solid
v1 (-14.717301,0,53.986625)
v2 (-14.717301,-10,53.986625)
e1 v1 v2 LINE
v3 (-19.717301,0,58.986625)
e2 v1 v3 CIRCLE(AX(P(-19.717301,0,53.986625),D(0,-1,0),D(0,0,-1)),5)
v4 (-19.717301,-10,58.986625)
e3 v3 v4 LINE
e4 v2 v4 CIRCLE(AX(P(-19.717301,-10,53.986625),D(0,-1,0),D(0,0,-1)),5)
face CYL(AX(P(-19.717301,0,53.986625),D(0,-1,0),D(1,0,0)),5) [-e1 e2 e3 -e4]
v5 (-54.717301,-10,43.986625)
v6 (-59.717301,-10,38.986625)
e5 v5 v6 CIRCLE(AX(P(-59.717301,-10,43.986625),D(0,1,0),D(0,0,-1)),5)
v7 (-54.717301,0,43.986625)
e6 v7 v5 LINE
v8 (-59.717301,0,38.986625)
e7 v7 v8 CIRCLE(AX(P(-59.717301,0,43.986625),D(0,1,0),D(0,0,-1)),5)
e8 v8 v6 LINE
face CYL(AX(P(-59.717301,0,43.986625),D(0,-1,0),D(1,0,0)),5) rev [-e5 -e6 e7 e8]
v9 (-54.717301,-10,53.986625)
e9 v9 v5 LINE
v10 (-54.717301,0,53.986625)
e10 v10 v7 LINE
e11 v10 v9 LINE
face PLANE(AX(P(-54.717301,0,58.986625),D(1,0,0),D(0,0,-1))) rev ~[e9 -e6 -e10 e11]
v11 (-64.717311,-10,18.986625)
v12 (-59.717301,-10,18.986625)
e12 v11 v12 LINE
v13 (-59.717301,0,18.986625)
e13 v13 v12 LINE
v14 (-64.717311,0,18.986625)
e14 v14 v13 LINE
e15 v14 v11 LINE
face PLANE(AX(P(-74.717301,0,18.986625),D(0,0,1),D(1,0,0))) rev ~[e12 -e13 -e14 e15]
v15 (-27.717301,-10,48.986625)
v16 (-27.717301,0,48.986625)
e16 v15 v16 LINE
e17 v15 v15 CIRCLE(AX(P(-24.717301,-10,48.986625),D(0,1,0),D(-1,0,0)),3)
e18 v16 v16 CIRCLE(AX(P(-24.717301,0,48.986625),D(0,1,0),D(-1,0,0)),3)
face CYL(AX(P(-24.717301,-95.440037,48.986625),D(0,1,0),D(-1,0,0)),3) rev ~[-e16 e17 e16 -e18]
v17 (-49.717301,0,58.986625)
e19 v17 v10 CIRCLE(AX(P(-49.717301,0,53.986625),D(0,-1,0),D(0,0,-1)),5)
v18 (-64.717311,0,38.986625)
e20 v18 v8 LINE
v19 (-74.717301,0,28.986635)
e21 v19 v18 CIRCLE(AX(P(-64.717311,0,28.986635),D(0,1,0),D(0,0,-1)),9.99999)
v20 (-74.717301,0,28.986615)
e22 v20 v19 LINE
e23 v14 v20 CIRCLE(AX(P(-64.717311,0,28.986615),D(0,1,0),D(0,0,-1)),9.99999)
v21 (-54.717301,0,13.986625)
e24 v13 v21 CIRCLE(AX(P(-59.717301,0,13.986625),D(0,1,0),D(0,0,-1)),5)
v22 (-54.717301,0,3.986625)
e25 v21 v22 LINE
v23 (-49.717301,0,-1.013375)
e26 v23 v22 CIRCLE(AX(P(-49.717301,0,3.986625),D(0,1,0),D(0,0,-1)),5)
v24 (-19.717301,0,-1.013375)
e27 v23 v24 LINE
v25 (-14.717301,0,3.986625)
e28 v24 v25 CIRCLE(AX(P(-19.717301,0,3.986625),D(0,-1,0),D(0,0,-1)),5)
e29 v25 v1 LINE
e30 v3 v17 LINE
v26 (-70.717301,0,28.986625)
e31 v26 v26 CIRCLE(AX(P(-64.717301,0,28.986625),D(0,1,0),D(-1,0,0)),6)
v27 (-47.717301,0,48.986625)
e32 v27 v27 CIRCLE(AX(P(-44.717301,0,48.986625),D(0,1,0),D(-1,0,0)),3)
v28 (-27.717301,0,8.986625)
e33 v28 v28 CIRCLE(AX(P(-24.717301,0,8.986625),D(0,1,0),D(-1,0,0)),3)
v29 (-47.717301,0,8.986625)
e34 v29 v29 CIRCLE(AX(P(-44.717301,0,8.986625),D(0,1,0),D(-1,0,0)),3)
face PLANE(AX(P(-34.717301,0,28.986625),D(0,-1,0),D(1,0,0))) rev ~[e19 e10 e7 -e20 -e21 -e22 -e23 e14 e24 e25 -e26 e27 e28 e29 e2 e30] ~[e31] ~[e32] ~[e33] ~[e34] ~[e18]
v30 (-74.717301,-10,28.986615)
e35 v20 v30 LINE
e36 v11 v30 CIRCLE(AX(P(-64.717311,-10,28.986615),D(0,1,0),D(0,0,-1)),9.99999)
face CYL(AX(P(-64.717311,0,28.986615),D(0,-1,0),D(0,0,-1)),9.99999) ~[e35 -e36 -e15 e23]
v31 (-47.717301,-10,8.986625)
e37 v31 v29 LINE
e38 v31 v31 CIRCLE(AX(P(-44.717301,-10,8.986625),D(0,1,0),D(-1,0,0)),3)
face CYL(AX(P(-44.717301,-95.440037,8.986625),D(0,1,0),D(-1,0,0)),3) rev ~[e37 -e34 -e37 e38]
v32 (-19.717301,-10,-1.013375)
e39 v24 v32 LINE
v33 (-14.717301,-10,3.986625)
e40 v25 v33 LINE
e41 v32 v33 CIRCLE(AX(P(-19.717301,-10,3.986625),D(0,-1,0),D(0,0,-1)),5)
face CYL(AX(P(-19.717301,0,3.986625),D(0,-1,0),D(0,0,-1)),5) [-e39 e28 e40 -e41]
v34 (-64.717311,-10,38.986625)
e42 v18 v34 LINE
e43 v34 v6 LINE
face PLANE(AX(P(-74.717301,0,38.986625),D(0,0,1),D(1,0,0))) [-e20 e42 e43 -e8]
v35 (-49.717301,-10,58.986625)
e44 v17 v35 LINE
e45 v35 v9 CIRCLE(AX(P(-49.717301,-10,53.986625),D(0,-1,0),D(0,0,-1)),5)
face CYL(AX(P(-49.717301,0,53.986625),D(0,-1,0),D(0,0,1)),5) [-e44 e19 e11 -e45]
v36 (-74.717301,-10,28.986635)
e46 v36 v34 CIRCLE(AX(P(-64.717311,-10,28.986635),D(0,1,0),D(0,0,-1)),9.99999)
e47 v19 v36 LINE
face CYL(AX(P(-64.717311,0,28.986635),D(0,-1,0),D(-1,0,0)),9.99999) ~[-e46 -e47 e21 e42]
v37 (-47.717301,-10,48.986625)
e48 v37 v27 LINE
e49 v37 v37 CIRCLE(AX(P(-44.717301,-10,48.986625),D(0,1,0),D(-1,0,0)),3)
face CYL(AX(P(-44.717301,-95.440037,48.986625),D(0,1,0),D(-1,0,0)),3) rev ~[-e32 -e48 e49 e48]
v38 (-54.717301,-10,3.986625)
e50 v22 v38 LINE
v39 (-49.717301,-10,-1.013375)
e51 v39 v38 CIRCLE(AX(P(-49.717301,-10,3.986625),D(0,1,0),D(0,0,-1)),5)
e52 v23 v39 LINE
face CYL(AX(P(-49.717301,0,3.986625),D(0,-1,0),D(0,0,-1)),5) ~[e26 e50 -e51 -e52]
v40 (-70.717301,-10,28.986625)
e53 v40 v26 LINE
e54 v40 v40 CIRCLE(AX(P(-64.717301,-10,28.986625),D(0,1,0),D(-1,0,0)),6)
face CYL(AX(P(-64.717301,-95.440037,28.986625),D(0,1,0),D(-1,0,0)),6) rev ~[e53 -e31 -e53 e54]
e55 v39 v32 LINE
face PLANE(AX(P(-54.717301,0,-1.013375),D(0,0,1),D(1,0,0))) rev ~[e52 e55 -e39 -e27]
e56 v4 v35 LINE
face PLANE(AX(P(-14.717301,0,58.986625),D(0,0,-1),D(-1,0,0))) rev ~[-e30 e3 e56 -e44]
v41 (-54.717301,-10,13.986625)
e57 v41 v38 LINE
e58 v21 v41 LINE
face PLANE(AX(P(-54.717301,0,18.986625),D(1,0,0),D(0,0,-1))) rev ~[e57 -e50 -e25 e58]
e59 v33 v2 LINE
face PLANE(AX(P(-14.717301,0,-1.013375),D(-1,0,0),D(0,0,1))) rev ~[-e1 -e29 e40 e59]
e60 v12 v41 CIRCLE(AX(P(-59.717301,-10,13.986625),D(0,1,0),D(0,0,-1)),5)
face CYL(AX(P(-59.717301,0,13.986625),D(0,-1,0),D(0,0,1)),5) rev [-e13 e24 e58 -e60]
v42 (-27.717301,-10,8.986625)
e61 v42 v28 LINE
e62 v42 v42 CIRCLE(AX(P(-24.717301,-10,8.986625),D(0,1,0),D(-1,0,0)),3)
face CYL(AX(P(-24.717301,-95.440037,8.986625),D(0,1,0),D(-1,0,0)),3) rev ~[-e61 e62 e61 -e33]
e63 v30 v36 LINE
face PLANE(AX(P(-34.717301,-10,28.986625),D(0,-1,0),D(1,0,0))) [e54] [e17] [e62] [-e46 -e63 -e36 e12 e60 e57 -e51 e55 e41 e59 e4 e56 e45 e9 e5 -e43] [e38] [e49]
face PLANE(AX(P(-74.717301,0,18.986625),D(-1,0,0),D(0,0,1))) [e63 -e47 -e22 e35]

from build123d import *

# Parameters (mm, degrees)
F0_W     = 20
F0_H     = 20
F1_DEPTH = 10
F2_R     = 5
F3_R     = 9.99999
F5_D     = 6
F7_D     = 12


# Not quite as in the source:
# - a fillet or chamfer is up to 0.001 mm smaller than in the source, because OpenCascade refuses the exact size


with BuildPart() as f1:
    # F0 (on Front) → F1 (new body)
    with BuildSketch(Plane.XZ):
        Polygon((-54.7173006759, -1.0133752964), (-14.7173006759, -1.0133752964), (-14.7173006759, 58.9866247036), (-54.7173006759, 58.9866247036), (-54.7173006759, 38.9866247036), (-54.7173006759, 18.9866247036), align=None)
        with Locations((-64.7173006759, 28.9866247036)):
            Rectangle(F0_W, F0_H)
    extrude(amount=F1_DEPTH)

    # F2
    f2_edges = [f1.edges().sort_by_distance(p)[0] for p in [
        (-54.717301, -5, 58.986625),
        (-54.717301, -5, -1.013375),
        (-14.717301, -5, 58.986625),
        (-14.717301, -5, -1.013375),
        (-54.717301, -5, 18.986625),
        (-54.717301, -5, 38.986625),
    ]]
    fillet(f2_edges, radius=F2_R)

    # F3 (radius 10 in the source; OpenCascade refuses exactly that, so slightly less here)
    f3_edges = [f1.edges().sort_by_distance(p)[0] for p in [
        (-74.717301, -5, 38.986625),
        (-74.717301, -5, 18.986625),
    ]]
    fillet(f3_edges, radius=F3_R)

    # F5 (through all)
    with Locations(Plane.XZ.offset(10)):
        with Locations((-44.7173006759, 48.9866247036), (-24.7173006759, 48.9866247036), (-24.7173006759, 8.9866247036), (-44.7173006759, 8.9866247036)):
            Hole(F5_D / 2)

    # F7 (through all)
    with Locations(Plane.XZ.offset(10)):
        with Locations((-64.7173006759, 28.9866247036)):
            Hole(F7_D / 2)


solid = f1.part
